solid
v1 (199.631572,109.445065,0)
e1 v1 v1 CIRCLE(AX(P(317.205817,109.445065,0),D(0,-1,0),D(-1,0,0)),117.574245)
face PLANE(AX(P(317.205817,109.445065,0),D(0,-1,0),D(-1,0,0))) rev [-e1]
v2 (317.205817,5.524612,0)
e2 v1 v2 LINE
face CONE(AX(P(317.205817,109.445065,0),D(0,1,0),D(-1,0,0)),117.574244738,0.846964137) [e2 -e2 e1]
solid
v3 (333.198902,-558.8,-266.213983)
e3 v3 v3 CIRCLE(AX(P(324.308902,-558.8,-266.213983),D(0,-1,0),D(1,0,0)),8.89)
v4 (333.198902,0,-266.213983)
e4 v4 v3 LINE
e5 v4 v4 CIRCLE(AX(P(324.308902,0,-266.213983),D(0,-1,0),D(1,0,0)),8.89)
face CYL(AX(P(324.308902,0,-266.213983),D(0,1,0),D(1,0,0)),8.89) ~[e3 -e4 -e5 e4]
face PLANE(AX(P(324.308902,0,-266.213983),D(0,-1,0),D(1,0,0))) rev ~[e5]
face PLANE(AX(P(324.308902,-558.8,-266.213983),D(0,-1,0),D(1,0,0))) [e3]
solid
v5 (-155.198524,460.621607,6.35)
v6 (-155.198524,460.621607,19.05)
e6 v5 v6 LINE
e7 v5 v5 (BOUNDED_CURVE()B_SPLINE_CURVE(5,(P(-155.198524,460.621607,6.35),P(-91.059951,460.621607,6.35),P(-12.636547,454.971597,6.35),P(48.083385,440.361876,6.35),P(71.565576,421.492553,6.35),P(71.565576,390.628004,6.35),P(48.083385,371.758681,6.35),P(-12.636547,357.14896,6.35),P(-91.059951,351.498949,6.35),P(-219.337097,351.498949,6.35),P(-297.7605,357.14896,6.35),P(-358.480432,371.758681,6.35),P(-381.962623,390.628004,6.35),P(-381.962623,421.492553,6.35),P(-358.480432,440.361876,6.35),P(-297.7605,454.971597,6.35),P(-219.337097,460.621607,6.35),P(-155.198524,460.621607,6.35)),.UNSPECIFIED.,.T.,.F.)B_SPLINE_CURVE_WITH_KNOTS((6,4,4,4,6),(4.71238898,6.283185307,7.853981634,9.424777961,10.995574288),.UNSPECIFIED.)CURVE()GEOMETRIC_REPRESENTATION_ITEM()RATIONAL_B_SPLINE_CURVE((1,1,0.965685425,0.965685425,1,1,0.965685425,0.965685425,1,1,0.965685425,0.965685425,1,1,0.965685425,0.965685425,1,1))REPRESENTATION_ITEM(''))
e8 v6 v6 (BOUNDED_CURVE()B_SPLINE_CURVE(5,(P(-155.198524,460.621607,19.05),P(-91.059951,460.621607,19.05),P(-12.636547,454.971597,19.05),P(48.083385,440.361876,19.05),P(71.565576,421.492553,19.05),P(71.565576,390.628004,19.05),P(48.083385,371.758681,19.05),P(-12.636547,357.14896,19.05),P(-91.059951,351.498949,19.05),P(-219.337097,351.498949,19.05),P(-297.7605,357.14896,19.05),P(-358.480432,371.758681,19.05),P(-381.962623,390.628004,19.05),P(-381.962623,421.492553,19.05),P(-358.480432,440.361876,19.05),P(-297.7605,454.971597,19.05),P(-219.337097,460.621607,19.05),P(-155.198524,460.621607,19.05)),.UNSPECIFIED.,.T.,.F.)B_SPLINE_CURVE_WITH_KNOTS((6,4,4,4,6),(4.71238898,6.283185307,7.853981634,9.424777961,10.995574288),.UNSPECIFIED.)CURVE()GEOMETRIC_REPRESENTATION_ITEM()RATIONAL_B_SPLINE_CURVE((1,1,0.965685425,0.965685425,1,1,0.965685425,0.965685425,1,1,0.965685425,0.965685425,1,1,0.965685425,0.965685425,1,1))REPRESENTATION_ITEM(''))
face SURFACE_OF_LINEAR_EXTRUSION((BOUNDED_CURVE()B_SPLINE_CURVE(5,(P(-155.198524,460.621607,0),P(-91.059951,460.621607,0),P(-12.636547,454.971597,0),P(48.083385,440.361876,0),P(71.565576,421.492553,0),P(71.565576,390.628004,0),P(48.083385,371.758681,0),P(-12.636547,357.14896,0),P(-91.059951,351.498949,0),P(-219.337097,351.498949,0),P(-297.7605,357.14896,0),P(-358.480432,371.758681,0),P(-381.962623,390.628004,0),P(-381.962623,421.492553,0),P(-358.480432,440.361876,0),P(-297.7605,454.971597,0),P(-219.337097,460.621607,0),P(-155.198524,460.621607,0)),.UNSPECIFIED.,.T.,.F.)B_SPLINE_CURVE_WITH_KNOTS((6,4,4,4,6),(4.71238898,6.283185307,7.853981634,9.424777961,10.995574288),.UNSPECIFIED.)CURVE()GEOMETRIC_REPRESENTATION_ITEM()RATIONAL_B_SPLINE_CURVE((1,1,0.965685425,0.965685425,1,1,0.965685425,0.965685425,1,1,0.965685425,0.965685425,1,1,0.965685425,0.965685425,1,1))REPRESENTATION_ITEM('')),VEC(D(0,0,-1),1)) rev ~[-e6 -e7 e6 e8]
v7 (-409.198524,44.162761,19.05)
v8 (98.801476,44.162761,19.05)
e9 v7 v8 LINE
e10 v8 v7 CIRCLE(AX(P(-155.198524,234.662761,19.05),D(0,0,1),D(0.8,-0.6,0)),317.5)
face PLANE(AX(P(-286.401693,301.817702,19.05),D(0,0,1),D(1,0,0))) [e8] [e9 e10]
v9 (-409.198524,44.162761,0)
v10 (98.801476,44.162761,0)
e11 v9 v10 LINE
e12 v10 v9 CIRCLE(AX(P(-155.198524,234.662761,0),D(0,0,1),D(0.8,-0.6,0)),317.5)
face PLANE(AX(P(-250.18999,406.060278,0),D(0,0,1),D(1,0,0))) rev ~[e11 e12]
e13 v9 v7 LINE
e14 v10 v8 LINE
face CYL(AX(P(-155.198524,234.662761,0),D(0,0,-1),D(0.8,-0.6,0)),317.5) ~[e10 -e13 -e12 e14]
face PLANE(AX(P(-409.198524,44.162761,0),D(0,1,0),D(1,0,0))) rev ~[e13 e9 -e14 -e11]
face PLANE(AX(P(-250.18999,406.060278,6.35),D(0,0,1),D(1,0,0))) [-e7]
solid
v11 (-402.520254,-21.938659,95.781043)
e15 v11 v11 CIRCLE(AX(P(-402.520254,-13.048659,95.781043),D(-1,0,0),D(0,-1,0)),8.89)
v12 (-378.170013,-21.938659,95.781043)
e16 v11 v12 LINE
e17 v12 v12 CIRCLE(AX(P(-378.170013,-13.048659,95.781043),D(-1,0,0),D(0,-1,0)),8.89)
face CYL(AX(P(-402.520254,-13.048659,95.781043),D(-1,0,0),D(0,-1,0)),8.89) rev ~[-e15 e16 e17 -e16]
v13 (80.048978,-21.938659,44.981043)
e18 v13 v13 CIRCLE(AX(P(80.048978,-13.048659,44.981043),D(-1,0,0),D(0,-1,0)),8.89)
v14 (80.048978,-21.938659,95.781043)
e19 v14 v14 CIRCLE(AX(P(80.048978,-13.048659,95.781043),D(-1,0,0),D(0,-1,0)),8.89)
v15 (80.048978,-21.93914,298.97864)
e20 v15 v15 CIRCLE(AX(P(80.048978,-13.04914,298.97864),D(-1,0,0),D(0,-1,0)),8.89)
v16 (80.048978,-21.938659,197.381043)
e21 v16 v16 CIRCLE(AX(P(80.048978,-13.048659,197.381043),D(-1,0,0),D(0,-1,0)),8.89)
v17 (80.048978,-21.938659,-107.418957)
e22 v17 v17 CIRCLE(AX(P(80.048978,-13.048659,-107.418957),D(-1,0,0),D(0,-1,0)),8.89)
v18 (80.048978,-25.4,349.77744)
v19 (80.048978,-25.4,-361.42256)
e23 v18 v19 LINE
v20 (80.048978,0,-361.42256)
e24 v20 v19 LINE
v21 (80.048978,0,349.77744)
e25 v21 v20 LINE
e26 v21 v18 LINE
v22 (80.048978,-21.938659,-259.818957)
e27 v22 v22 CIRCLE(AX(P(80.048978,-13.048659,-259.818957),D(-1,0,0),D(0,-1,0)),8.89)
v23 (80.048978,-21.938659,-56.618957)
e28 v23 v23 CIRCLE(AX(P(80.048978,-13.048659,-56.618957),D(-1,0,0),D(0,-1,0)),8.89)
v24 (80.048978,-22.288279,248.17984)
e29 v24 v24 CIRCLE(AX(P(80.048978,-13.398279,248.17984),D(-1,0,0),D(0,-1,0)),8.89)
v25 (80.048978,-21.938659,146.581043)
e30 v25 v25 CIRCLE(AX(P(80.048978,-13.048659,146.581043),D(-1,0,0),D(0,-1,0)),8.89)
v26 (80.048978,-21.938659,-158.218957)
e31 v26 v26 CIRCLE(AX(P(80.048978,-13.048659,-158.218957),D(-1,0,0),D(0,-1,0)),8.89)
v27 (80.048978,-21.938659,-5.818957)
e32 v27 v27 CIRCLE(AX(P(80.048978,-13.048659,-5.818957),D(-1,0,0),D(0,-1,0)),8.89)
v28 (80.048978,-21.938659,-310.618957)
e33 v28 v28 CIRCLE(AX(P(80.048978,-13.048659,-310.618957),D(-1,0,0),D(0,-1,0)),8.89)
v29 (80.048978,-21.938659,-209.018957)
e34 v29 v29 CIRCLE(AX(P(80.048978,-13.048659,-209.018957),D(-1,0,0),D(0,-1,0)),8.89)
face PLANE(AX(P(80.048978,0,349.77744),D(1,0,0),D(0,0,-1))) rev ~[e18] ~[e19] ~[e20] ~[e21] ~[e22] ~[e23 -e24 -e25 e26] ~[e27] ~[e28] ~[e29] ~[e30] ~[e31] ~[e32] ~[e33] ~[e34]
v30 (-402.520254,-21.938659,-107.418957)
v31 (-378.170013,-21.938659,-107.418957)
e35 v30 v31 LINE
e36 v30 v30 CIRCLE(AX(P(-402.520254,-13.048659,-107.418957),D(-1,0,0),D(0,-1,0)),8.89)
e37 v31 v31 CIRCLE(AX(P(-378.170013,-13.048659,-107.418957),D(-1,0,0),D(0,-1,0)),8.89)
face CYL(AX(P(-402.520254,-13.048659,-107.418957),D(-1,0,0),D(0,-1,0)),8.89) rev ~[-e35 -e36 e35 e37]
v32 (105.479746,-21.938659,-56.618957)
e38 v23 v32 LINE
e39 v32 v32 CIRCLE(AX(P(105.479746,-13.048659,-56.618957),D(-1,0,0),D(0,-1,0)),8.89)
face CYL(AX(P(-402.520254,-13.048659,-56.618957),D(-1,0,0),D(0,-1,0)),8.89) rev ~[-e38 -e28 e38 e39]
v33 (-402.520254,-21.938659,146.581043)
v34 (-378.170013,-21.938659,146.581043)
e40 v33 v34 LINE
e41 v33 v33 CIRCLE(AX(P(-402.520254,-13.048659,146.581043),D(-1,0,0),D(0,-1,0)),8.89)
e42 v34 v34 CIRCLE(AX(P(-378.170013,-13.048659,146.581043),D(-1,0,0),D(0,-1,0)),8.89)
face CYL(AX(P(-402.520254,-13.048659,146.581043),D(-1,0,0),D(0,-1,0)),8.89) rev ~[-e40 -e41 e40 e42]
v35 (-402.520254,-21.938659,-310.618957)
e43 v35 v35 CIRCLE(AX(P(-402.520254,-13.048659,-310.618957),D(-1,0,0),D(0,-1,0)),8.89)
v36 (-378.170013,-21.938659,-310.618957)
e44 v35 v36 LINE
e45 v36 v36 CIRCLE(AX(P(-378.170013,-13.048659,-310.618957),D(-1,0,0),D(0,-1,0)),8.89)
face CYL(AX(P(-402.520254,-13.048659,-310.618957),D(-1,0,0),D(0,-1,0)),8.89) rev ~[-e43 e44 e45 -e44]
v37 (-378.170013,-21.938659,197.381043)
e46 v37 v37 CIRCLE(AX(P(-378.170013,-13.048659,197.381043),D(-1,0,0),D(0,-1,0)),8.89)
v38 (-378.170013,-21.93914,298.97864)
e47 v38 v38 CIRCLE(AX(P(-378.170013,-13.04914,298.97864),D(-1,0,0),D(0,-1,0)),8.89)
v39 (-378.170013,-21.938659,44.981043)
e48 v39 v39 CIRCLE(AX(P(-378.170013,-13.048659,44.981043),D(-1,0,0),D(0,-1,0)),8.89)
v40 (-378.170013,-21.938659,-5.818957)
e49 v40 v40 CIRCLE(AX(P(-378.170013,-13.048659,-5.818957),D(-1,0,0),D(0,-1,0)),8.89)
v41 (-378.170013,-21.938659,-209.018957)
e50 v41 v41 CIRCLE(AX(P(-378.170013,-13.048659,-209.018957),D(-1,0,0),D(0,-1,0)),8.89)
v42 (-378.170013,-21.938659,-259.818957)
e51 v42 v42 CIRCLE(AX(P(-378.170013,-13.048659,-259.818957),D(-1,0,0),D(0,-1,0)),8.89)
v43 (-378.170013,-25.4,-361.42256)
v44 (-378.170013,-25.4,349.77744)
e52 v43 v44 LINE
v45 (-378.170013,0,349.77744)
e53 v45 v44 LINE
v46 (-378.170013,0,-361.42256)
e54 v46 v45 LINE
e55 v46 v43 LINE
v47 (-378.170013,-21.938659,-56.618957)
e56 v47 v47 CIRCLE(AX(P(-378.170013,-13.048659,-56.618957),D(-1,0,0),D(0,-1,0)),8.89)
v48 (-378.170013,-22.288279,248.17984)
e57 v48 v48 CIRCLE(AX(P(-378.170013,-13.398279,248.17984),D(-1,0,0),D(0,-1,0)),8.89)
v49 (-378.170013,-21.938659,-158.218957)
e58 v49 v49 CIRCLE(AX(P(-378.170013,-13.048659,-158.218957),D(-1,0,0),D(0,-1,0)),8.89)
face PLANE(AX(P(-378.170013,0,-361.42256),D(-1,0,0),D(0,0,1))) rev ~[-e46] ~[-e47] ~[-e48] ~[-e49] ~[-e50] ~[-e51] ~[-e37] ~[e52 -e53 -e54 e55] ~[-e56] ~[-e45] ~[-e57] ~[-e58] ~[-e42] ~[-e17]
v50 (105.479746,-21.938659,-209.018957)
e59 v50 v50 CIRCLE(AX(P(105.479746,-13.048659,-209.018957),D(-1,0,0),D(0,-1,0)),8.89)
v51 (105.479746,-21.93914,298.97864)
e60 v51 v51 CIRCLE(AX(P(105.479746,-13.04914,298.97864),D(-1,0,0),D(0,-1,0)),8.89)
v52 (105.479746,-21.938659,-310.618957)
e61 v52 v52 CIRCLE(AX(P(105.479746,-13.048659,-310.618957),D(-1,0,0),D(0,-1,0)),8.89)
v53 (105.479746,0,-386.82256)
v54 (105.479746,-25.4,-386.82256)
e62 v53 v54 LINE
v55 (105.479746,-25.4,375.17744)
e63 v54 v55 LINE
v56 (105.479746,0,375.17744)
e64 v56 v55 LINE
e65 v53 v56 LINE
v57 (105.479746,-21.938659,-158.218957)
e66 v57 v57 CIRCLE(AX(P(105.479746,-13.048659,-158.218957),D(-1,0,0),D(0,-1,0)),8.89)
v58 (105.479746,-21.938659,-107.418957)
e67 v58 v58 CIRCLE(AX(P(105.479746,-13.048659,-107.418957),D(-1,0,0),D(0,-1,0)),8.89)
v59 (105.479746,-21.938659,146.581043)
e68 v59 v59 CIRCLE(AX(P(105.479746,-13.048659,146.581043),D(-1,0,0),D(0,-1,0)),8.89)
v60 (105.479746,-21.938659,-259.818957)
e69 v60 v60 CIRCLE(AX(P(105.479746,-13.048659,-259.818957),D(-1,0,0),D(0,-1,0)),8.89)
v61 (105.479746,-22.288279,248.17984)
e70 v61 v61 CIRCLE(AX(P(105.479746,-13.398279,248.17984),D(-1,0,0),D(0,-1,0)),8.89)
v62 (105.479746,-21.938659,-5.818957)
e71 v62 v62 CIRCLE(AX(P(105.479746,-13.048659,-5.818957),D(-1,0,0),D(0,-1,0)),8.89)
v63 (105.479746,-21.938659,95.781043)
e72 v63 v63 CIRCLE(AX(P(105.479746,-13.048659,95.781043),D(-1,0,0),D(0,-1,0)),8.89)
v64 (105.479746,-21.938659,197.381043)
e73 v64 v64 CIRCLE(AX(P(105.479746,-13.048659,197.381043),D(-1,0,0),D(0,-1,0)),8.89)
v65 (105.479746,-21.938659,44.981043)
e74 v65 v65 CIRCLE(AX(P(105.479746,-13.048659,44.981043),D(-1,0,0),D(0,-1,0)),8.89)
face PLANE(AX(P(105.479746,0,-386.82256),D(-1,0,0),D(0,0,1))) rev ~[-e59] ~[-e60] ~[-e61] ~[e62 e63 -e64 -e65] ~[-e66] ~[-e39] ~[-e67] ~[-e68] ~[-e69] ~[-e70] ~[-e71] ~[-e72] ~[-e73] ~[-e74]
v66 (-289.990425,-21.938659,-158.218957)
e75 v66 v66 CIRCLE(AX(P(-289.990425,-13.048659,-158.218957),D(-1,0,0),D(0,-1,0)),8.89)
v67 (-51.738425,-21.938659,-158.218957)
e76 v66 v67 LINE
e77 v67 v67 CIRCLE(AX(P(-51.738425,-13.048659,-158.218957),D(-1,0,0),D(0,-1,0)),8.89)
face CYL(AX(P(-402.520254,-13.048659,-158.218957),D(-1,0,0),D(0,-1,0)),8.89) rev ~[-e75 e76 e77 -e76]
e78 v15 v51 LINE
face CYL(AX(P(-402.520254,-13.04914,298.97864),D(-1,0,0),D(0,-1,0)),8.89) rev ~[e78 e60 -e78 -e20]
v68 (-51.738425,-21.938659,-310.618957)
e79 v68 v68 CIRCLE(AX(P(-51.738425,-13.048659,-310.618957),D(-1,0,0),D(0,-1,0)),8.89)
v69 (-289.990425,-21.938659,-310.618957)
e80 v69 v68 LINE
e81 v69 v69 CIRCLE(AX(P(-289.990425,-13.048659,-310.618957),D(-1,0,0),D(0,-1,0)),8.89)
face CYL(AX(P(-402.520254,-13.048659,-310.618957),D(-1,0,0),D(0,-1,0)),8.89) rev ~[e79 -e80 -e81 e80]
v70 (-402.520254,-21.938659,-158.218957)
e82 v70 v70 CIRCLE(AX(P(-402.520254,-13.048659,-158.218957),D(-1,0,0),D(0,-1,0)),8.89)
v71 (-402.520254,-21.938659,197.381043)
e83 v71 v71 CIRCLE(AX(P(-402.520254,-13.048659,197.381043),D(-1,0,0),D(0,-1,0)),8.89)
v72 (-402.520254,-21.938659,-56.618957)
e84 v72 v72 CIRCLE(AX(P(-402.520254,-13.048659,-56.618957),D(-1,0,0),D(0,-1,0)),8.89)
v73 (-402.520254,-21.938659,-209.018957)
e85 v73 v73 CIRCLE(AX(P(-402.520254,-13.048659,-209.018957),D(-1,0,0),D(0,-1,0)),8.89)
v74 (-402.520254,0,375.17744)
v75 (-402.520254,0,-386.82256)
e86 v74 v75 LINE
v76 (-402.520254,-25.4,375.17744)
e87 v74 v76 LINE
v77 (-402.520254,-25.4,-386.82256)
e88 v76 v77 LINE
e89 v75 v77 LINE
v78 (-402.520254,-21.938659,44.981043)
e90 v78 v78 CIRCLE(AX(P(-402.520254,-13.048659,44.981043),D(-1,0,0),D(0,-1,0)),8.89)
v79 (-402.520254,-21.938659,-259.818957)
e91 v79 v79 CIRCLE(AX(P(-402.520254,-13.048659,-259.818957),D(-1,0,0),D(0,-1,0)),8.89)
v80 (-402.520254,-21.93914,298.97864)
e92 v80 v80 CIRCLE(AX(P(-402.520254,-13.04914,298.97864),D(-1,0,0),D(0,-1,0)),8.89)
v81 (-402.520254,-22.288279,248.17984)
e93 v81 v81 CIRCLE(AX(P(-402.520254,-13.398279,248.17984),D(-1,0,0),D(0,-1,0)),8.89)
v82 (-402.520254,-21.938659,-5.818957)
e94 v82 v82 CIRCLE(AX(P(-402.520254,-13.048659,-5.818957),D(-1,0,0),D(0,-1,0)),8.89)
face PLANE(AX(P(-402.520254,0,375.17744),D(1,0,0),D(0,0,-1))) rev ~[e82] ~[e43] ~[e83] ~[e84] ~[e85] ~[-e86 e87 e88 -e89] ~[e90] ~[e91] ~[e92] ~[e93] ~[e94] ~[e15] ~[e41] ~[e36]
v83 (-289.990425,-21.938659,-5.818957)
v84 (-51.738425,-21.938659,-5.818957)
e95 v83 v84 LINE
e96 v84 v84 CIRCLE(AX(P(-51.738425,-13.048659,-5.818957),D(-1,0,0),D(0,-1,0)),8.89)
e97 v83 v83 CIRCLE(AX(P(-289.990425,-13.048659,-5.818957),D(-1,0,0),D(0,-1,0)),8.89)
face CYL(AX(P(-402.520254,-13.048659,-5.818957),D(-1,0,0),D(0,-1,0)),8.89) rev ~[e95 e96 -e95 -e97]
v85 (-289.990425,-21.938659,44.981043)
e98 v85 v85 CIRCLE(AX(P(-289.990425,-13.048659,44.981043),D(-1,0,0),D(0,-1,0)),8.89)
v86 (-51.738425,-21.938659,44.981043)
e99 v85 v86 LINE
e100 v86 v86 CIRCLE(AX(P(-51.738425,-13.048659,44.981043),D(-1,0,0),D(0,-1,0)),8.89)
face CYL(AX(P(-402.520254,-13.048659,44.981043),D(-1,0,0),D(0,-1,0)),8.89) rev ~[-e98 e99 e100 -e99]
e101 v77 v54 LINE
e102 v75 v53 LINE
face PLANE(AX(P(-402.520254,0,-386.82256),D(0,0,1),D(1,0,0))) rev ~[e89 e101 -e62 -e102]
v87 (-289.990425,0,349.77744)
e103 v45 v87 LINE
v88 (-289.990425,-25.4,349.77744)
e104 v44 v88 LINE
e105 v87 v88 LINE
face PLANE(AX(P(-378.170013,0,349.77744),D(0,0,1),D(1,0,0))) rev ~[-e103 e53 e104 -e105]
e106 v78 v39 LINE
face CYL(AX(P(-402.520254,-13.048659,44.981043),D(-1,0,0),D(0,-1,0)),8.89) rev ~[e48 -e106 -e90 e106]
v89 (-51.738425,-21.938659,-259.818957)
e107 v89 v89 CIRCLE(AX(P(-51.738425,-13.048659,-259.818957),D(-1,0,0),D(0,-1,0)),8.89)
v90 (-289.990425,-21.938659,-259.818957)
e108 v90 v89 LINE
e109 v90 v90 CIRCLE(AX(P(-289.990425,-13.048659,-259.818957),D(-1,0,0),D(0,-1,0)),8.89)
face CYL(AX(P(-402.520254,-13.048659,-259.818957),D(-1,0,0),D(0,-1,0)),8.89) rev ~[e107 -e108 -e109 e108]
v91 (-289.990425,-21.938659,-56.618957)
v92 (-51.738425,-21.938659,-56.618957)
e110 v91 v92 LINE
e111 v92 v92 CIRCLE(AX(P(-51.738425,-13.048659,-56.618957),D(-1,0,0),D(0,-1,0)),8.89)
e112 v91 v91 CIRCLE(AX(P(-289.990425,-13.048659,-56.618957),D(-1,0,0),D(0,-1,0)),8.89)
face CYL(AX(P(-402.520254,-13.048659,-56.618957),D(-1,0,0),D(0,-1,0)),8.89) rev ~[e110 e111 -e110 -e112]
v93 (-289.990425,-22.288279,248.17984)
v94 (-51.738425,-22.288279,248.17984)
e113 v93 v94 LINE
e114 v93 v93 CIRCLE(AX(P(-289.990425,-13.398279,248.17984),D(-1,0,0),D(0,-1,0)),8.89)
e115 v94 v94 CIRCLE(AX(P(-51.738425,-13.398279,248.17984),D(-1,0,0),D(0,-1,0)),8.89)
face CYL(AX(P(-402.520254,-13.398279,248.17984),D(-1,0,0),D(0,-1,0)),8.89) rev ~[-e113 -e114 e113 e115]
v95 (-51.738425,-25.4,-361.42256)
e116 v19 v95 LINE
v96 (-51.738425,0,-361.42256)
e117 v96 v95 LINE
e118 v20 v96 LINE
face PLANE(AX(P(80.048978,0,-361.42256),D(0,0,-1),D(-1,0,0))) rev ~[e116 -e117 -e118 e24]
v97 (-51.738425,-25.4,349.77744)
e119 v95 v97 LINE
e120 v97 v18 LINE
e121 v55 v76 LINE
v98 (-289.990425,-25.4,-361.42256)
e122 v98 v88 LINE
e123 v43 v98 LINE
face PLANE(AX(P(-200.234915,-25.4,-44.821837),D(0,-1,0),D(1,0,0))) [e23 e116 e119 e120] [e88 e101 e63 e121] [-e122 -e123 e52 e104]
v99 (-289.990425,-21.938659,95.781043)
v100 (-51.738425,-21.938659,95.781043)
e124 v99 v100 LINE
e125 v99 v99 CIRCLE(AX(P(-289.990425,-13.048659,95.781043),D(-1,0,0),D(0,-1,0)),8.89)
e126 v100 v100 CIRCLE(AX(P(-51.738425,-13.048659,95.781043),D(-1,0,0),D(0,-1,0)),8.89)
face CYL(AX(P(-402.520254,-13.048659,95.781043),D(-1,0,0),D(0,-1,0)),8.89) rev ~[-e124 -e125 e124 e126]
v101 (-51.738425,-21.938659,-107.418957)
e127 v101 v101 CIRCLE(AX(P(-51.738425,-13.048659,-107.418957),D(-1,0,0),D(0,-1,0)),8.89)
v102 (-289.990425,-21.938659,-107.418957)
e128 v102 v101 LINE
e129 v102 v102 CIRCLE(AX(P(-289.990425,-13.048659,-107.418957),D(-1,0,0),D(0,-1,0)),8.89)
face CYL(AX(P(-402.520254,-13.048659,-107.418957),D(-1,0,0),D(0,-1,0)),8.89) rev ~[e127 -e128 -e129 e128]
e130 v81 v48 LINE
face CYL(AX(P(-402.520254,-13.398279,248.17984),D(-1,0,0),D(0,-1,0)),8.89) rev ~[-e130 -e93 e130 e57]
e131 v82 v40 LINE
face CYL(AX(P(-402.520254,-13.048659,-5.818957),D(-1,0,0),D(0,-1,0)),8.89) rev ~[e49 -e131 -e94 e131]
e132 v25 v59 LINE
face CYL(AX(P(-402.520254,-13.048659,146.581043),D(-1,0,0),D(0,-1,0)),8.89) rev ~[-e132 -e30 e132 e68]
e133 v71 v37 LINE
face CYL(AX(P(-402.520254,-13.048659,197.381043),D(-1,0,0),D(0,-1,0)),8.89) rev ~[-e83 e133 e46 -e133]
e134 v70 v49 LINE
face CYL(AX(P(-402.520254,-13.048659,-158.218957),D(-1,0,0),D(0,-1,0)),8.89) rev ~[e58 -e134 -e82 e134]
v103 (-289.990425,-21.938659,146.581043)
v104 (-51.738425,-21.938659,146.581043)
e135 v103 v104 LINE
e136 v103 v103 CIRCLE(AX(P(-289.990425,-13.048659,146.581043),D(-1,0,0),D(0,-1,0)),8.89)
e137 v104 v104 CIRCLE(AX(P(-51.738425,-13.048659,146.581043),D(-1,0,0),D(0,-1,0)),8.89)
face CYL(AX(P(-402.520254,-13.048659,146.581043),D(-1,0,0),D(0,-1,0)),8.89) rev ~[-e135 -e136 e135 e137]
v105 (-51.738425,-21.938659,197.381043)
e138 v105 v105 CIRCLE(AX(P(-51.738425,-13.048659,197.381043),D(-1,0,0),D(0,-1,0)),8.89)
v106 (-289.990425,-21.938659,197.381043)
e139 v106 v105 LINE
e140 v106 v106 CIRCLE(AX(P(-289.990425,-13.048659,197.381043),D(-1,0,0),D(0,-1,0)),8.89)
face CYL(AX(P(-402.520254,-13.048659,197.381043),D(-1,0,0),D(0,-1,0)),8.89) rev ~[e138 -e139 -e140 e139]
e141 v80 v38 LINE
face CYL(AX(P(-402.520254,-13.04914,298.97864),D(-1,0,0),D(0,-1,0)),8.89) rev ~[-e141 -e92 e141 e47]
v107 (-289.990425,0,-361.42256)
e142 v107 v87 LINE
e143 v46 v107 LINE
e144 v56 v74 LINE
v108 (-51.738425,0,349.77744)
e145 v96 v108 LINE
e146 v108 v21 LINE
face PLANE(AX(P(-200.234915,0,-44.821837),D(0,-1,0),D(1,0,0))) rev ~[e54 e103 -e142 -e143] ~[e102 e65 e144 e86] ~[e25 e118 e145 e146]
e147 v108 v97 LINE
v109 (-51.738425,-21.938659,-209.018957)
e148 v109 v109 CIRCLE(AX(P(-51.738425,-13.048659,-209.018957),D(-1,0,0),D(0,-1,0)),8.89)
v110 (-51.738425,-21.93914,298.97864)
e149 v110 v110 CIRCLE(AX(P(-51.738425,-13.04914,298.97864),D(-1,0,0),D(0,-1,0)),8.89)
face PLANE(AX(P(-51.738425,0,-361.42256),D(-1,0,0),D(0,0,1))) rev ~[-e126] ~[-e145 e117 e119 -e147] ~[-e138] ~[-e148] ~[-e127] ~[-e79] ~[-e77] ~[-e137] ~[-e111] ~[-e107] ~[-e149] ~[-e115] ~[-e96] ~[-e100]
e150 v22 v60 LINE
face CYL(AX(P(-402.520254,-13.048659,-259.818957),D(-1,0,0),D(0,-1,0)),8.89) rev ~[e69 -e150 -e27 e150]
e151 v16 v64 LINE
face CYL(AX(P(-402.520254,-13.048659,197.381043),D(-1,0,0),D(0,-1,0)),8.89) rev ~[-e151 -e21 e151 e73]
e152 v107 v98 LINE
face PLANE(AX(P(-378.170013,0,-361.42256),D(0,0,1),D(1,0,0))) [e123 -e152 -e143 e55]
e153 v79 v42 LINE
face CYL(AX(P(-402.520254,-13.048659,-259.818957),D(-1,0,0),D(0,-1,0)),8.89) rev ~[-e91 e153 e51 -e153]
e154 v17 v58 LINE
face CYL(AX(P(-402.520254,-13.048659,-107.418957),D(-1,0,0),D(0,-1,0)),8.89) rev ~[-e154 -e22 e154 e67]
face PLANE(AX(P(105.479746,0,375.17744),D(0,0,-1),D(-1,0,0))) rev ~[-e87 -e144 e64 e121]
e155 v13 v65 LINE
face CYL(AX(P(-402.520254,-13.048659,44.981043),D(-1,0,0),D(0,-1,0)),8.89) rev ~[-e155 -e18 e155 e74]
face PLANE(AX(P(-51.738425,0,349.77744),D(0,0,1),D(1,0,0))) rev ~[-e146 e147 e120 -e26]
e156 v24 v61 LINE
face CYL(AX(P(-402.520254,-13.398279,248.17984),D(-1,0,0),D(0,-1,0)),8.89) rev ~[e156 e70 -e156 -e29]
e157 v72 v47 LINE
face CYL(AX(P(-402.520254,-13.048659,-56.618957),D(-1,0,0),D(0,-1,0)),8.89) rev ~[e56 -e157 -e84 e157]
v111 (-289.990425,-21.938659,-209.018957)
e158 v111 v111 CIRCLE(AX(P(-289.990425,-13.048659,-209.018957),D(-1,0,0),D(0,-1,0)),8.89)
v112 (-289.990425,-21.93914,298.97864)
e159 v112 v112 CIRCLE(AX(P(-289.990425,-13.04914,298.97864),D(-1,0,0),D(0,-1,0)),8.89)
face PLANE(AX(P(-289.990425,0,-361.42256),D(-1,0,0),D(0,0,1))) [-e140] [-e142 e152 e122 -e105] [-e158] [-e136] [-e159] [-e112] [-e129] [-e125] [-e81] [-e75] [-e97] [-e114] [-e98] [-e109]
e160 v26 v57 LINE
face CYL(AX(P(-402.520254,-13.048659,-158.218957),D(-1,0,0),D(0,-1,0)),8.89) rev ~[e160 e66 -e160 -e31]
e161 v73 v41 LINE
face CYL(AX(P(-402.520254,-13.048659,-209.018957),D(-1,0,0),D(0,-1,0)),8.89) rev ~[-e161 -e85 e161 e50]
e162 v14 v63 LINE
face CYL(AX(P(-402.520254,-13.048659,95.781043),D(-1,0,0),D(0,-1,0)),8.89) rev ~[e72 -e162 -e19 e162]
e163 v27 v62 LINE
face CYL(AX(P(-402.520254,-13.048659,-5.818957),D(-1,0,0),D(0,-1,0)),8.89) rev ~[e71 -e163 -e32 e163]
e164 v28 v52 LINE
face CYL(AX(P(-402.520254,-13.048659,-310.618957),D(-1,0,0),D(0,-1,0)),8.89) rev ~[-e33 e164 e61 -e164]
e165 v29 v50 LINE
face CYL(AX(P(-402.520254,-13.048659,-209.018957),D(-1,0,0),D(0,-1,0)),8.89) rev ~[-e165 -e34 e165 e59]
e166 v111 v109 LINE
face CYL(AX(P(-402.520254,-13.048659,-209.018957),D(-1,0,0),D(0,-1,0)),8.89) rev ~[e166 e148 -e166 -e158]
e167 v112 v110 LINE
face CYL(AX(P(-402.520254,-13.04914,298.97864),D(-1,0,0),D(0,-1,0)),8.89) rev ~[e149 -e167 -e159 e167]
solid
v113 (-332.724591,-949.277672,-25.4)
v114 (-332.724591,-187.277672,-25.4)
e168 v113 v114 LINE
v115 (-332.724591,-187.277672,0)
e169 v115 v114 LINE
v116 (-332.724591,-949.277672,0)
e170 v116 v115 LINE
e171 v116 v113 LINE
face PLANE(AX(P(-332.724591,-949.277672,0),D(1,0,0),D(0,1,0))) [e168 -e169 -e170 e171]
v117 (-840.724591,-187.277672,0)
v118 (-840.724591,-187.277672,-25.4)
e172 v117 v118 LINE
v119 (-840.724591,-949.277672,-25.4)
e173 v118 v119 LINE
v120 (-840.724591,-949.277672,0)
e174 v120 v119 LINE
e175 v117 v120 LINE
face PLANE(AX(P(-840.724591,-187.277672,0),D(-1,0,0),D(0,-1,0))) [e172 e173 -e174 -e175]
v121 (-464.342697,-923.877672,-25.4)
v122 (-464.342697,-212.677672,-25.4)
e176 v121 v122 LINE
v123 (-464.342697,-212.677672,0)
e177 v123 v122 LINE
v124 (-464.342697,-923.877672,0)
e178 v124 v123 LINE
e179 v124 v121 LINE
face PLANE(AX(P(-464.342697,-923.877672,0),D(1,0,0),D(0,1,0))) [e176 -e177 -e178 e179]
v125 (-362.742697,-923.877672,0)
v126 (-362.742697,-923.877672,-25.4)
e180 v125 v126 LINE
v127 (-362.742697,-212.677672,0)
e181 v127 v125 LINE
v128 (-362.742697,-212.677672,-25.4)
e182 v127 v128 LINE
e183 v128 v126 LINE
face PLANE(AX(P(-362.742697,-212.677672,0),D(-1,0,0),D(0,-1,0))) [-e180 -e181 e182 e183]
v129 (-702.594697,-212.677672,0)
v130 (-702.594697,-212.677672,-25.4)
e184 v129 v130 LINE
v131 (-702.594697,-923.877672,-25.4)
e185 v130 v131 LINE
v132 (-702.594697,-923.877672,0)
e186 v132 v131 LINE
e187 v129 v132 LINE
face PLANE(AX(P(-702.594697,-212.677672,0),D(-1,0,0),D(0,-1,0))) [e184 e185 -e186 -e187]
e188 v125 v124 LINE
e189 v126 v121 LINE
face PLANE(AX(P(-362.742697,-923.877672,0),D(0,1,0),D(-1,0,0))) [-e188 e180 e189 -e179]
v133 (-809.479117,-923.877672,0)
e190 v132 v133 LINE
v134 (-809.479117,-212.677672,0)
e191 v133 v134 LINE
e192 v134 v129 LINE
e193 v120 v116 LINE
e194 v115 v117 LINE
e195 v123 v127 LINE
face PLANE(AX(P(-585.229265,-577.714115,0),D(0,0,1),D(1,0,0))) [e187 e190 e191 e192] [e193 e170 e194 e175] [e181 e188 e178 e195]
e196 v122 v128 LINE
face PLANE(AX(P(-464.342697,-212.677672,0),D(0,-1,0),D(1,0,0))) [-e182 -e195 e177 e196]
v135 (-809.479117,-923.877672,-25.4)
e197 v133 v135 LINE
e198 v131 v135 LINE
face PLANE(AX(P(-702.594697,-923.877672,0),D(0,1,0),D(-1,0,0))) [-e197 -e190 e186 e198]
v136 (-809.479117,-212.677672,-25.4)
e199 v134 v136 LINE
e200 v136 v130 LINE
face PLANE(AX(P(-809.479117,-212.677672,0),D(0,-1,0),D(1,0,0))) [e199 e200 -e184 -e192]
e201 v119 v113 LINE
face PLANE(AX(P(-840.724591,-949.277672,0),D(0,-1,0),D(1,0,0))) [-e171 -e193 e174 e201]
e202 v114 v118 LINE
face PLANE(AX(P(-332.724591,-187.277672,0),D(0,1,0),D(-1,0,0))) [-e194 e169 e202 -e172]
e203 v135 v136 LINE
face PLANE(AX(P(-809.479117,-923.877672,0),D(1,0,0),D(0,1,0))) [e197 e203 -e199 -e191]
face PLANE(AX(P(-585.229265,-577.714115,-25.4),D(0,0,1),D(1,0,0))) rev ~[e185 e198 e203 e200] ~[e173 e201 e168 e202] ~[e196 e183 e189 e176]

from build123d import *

# Parameters (mm, degrees)
F0_W      = 88.1795883179
F0_H      = 711.2
F1_DEPTH  = 25.4
F3_DEPTH  = 19.05
F4_R      = 8.89
F5_DEPTH  = 564.8227298821
F8_R      = 8.89
F9_DEPTH  = 558.8
F11_DEPTH = 25.4
F12_DEPTH = 6.35


# Not quite as in the source:
# - a feature names something its author has since deleted; it is built from what else it names


with BuildPart() as f1:
    # F0 (on Front) → F1 (new body)
    with BuildSketch(Plane.XZ):
        Polygon((-402.5202535568, 375.1774401814), (-402.5202535568, -386.8225598186), (80.0489783287, -386.8225598186), (80.0489783287, -361.4225598186), (-51.7384251099, -361.4225598186), (-51.7384251099, 349.7774401814), (-51.7384251099, 375.1774401814), align=None)
        with Locations((-334.0802192688, -5.8225598186)):
            Rectangle(F0_W, F0_H, mode=Mode.SUBTRACT)
        Polygon((80.0489783287, -361.4225598186), (80.0489783287, -386.8225598186), (105.4797464432, -386.8225598186), (105.4797464432, 375.1774401814), (-51.7384251099, 375.1774401814), (-51.7384251099, 349.7774401814), (80.0489783287, 349.7774401814), align=None)
    extrude(amount=F1_DEPTH)

    # F4 (on face) → F5 (cut, through all)
    with BuildSketch(Plane(origin=(-402.5202535568, 0, 0), x_dir=(0, -1, 0), z_dir=(-1, 0, 0))):
        with Locations((13.0486593567, -310.6189571056)):
            Circle(F4_R)
        with Locations((13.0486593567, -259.8189571056)):
            Circle(F4_R)
        with Locations((13.0486593567, -209.0189571056)):
            Circle(F4_R)
        with Locations((13.0486593567, 146.5810428944)):
            Circle(F4_R)
        with Locations((13.0486593567, 95.7810428944)):
            Circle(F4_R)
        with Locations((13.0486593567, 44.9810428944)):
            Circle(F4_R)
        with Locations((13.0486593567, -5.8189571056)):
            Circle(F4_R)
        with Locations((13.0486593567, -56.6189571056)):
            Circle(F4_R)
        with Locations((13.0486593567, -107.4189571056)):
            Circle(F4_R)
        with Locations((13.0486593567, -158.2189571056)):
            Circle(F4_R)
        with Locations((13.0491397289, 298.9786399844)):
            Circle(F4_R)
        with Locations((13.3982794578, 248.1798397875)):
            Circle(F4_R)
        with Locations((13.0486593567, 197.3810428944)):
            Circle(F4_R)
    extrude(amount=-F5_DEPTH, mode=Mode.SUBTRACT)


with BuildPart() as f3:
    # F2 (on Top) → F3 (new body)
    with BuildSketch(Plane.XY):
        with BuildLine():
            ThreePointArc((-155.1985237747, 552.16276142), (-439.1791569172, 376.6530779912), (-409.1985237747, 44.16276142))
            Line((-409.1985237747, 44.16276142), (-155.1985237747, 44.16276142))
            Line((-155.1985237747, 44.16276142), (-155.1985237747, 351.4989493568))
            add(Edge.make_bspline(
                [(-155.1985237747, 460.6216074745), (-381.9626234472, 460.6216074745), (-381.9626234472, 406.0602784157), (-381.9626234472, 351.4989493568), (-155.1985237747, 351.4989493568)],
                knots=[1.5707963268, 1.5707963268, 1.5707963268, 3.1415926536, 3.1415926536, 4.7123889804, 4.7123889804, 4.7123889804], degree=2, weights=[1, 0.7071067812, 1, 0.7071067812, 1]))
            Line((-155.1985237747, 460.6216074745), (-155.1985237747, 552.16276142))
        make_face()
        with BuildLine():
            Line((-155.1985237747, 351.4989493568), (-155.1985237747, 44.16276142))
            Line((-155.1985237747, 44.16276142), (98.8014762253, 44.16276142))
            ThreePointArc((98.8014762253, 44.16276142), (128.7821093677, 376.6530779912), (-155.1985237747, 552.16276142))
            Line((-155.1985237747, 552.16276142), (-155.1985237747, 460.6216074745))
            add(Edge.make_bspline(
                [(71.5655758977, 406.0602784157), (71.5655758977, 460.6216074745), (-155.1985237747, 460.6216074745)],
                knots=[0, 0, 0, 1.5707963268, 1.5707963268, 1.5707963268], degree=2, weights=[1, 0.7071067812, 1]))
            add(Edge.make_bspline(
                [(-155.1985237747, 351.4989493568), (71.5655758977, 351.4989493568), (71.5655758977, 406.0602784157)],
                knots=[4.7123889804, 4.7123889804, 4.7123889804, 6.2831853072, 6.2831853072, 6.2831853072], degree=2, weights=[1, 0.7071067812, 1]))
        make_face()
    extrude(amount=F3_DEPTH)

    # F2 (on Top) → F12 (join)
    with BuildSketch(Plane.XY):
        with BuildLine():
            add(Edge.make_bspline(
                [(-155.1985237747, 460.6216074745), (-381.9626234472, 460.6216074745), (-381.9626234472, 406.0602784157), (-381.9626234472, 351.4989493568), (-155.1985237747, 351.4989493568)],
                knots=[1.5707963268, 1.5707963268, 1.5707963268, 3.1415926536, 3.1415926536, 4.7123889804, 4.7123889804, 4.7123889804], degree=2, weights=[1, 0.7071067812, 1, 0.7071067812, 1]))
            Line((-155.1985237747, 351.4989493568), (-155.1985237747, 460.6216074745))
        make_face()
        with BuildLine():
            Line((-155.1985237747, 460.6216074745), (-155.1985237747, 351.4989493568))
            add(Edge.make_bspline(
                [(-155.1985237747, 351.4989493568), (71.5655758977, 351.4989493568), (71.5655758977, 406.0602784157)],
                knots=[4.7123889804, 4.7123889804, 4.7123889804, 6.2831853072, 6.2831853072, 6.2831853072], degree=2, weights=[1, 0.7071067812, 1]))
            add(Edge.make_bspline(
                [(71.5655758977, 406.0602784157), (71.5655758977, 460.6216074745), (-155.1985237747, 460.6216074745)],
                knots=[0, 0, 0, 1.5707963268, 1.5707963268, 1.5707963268], degree=2, weights=[1, 0.7071067812, 1]))
        make_face()
    extrude(amount=F12_DEPTH)


with BuildPart() as f7:
    # F6 (on Top) → F7 (revolve)
    with BuildSketch(Plane.XY):
        Polygon((317.2058165073, 109.4450652599), (199.6315717697, 109.4450652599), (317.2058165073, 5.5246124975), align=None)
    revolve(axis=Axis((317.2058165073, 57.4848388787, 0), (0, -1, 0)))


with BuildPart() as f9:
    # F8 (on Front) → F9 (new body)
    with BuildSketch(Plane.XZ):
        with Locations((324.3089020252, -266.2139832973)):
            Circle(F8_R)
    extrude(amount=F9_DEPTH)


with BuildPart() as f11:
    # F10 (on Top) → F11 (new body)
    with BuildSketch(Plane.XY):
        Polygon((-754.7940611839, -187.2776719332), (-840.7245906978, -187.2776719332), (-840.7245906978, -949.2776719332), (-332.7245906978, -949.2776719332), (-332.7245906978, -187.2776719332), (-426.6838133335, -187.2776719332), (-426.6838133335, -212.6776719332), (-362.7426974754, -212.6776719332), (-362.7426974754, -923.8776719332), (-464.3426974754, -923.8776719332), (-464.3426974754, -212.6776719332), (-702.5946974754, -212.6776719332), (-702.5946974754, -923.8776719332), (-809.4791173935, -923.8776719332), (-809.4791173935, -212.6776719332), (-754.7940611839, -212.6776719332), align=None)
        Polygon((-426.6838133335, -187.2776719332), (-754.7940611839, -187.2776719332), (-754.7940611839, -212.6776719332), (-702.5946974754, -212.6776719332), (-464.3426974754, -212.6776719332), (-426.6838133335, -212.6776719332), align=None)
    extrude(amount=-F11_DEPTH)


solid = Compound([f1.part, f3.part, f7.part, f9.part, f11.part])
